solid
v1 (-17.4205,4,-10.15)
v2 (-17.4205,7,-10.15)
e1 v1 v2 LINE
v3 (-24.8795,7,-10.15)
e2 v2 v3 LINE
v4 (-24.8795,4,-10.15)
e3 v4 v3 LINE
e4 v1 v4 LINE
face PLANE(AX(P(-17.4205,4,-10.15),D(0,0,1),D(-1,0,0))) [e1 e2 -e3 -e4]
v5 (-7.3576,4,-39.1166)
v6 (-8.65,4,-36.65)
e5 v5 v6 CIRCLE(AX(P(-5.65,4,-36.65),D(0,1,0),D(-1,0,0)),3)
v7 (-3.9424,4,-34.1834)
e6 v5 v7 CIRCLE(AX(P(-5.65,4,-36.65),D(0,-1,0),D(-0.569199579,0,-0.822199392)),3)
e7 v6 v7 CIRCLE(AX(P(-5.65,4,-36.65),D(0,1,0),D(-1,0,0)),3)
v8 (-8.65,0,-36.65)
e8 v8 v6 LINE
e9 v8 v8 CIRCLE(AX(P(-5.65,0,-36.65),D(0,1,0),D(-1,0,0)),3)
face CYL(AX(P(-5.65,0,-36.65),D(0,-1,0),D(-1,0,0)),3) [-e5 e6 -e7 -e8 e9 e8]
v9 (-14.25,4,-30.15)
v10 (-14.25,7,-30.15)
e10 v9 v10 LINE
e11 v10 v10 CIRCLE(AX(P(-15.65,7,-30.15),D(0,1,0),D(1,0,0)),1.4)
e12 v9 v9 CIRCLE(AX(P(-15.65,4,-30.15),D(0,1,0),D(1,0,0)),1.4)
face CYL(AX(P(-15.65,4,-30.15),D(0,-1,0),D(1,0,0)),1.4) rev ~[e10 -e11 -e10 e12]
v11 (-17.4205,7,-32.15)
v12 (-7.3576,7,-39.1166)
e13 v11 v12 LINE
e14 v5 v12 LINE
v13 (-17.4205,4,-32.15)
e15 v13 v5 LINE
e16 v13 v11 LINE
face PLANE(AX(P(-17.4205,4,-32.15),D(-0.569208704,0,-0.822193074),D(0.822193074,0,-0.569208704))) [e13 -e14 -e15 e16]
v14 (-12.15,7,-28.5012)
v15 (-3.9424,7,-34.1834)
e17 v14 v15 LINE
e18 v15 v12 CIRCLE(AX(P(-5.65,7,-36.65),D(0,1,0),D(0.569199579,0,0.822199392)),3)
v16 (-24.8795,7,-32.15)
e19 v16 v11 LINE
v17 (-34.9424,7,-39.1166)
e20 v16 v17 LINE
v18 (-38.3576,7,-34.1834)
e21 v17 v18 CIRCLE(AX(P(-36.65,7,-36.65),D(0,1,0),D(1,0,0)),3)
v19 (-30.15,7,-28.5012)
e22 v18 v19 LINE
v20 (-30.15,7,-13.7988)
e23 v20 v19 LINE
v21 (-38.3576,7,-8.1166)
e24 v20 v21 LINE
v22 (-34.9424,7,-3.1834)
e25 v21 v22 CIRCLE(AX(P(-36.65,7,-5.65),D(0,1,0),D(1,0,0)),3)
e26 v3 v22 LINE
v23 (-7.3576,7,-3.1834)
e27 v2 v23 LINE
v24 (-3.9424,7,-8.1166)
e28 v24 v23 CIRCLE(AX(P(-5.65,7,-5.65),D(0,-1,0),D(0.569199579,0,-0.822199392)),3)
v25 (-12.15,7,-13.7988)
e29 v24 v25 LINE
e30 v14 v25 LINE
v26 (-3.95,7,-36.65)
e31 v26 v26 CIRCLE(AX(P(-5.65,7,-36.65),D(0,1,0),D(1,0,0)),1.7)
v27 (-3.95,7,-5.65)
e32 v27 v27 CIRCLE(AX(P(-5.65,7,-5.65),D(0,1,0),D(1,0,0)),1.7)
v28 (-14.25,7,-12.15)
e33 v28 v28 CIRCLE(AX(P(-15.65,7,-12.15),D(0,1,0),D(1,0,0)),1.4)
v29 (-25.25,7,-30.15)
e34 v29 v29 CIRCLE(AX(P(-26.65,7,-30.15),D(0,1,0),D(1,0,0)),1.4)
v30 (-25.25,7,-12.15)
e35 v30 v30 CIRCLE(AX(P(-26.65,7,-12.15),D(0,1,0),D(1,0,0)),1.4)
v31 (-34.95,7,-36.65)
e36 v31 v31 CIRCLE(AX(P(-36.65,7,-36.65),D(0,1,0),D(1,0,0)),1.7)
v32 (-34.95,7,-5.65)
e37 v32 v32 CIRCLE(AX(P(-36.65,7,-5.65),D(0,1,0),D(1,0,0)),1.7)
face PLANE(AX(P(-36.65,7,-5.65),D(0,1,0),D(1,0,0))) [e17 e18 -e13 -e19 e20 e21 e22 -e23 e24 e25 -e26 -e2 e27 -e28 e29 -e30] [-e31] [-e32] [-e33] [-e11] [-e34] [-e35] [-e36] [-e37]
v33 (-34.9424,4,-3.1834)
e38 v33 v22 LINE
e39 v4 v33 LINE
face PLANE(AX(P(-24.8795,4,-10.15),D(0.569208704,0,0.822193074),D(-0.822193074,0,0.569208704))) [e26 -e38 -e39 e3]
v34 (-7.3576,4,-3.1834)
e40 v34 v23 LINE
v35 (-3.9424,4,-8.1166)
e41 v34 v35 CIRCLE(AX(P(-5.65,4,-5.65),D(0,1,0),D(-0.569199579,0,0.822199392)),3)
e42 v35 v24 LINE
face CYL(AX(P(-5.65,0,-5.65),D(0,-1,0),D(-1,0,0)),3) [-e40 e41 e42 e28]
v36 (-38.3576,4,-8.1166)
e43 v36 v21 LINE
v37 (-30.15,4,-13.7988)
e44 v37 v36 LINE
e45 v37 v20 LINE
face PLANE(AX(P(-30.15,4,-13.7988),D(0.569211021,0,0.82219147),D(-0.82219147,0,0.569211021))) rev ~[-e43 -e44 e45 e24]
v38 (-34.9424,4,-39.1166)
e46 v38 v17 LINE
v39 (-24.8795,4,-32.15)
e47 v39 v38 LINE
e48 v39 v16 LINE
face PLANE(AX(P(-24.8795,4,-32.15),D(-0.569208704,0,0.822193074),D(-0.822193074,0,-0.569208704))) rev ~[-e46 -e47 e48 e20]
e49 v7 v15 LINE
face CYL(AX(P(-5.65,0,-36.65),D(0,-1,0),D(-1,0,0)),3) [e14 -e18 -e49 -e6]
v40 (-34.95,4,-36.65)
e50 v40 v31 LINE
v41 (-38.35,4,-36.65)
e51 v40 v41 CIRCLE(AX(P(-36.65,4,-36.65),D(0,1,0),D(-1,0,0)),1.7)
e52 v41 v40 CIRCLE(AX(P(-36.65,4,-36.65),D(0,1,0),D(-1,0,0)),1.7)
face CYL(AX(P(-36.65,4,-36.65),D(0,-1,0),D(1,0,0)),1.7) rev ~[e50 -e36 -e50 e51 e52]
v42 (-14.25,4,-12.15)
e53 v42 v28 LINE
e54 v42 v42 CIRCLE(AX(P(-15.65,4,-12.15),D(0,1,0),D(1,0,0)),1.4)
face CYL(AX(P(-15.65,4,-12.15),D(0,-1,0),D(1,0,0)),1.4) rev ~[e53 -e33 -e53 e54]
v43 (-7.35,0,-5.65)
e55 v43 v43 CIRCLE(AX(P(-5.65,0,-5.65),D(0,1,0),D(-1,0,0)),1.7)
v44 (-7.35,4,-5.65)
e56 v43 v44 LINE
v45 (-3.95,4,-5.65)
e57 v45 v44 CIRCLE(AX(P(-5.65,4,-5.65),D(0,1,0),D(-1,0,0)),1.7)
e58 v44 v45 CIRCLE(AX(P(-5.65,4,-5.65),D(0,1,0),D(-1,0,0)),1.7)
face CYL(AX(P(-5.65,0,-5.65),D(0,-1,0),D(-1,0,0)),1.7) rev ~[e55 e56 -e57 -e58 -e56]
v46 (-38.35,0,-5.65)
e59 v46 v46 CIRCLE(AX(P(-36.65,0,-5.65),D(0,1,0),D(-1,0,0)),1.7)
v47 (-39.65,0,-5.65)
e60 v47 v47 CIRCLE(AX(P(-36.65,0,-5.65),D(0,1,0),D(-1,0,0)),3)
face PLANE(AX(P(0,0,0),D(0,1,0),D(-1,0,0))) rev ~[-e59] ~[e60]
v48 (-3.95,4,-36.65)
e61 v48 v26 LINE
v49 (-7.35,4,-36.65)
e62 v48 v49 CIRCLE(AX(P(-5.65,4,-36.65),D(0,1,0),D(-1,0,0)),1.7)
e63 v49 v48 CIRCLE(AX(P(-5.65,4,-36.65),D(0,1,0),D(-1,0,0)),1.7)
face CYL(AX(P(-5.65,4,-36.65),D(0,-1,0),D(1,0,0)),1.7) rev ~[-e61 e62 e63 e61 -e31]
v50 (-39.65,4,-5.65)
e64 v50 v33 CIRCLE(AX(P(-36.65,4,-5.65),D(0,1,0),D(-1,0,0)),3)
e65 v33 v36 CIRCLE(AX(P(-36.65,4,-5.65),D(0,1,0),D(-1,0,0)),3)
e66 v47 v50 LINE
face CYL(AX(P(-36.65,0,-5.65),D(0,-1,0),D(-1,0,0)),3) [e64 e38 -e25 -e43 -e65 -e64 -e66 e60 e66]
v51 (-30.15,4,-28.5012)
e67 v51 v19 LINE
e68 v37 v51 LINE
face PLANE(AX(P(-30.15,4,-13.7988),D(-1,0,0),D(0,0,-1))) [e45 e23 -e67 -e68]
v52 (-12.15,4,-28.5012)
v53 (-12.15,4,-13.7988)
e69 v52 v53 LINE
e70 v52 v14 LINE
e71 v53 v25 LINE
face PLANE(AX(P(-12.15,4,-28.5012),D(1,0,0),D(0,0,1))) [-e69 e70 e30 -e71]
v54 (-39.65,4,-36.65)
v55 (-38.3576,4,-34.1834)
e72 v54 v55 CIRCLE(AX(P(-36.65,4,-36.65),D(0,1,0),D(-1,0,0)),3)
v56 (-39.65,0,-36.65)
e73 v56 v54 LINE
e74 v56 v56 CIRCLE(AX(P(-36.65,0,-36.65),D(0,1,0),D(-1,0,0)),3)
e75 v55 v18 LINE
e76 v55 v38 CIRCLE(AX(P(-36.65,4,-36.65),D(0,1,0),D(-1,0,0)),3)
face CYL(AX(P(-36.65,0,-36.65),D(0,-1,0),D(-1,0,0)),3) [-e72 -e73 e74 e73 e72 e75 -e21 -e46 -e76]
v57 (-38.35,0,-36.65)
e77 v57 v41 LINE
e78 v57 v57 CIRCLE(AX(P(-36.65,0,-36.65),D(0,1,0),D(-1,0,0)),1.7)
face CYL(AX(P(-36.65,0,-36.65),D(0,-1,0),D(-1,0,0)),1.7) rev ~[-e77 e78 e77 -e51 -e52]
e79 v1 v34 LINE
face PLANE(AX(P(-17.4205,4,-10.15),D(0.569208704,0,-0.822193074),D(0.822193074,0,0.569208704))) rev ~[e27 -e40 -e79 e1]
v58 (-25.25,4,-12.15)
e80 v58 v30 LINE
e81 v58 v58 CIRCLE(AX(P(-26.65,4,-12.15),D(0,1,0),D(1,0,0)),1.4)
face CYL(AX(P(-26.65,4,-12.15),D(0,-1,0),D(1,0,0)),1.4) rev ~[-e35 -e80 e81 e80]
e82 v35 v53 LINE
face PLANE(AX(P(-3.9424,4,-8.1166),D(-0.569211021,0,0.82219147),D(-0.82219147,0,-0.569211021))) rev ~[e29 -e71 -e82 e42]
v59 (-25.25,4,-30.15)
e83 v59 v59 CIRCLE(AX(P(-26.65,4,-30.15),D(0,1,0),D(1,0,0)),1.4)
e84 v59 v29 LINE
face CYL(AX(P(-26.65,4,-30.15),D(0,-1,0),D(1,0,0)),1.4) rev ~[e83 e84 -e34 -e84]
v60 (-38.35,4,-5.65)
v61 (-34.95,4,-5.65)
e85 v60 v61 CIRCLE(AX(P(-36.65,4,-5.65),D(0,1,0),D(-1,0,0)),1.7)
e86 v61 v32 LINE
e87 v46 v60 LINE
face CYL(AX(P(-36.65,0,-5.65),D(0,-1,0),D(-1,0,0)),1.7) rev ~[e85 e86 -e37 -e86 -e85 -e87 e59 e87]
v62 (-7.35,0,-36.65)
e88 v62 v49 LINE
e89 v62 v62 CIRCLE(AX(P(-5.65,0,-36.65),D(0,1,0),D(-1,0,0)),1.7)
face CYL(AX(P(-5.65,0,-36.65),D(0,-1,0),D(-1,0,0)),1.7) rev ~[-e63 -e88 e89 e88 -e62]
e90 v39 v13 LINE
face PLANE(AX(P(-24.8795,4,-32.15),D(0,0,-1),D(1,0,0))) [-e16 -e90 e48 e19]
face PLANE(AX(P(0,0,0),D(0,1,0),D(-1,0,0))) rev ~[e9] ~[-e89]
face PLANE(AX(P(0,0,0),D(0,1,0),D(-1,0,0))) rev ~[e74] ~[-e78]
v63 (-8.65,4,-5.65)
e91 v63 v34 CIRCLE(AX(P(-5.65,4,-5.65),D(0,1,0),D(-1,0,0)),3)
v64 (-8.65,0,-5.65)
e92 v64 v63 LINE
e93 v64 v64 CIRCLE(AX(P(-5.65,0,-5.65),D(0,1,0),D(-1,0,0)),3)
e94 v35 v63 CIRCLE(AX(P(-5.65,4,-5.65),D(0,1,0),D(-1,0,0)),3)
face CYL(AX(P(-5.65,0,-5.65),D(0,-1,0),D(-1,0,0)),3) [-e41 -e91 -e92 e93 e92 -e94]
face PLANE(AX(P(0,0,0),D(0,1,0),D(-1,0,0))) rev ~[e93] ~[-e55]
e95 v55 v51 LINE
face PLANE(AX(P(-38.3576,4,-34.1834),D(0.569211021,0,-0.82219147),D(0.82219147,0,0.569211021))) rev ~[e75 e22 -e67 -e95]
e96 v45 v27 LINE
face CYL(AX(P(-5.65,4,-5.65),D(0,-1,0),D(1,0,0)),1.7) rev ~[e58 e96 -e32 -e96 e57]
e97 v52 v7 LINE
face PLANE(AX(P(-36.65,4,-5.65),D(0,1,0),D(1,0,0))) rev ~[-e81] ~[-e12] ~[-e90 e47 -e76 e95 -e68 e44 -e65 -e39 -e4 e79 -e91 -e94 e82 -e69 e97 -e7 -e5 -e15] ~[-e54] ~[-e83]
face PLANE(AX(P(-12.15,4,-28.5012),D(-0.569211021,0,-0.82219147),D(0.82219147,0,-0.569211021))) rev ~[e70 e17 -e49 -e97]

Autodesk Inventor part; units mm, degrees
ref_plane "YZ Plane" through (0, 0, 0) normal (1, 0, 0) x (0, 1, 0)
ref_plane "XZ Plane" through (0, 0, 0) normal (0, 1, 0) x (-1, 0, 0)
ref_plane "XY Plane" through (0, 0, 0) normal (0, 0, 1) x (1, 0, 0)
sketch "Sketch1" plane through (0, 0, 0) normal (0, 1, 0) x (-1, 0, 0)
  line L0 (0, 0) -> (42.3, 0) construction
  line L1 (42.3, 0) -> (42.3, -42.3) construction
  line L2 (42.3, -42.3) -> (0, -42.3) construction
  line L3 (0, -42.3) -> (0, 0) construction
  circle A0 centre (36.65, -5.65) radius 1.7
  circle A1 centre (36.65, -36.65) radius 1.7
  circle A2 centre (5.65, -5.65) radius 1.7
  circle A3 centre (5.65, -36.65) radius 1.7
  line L4 (5.65, -5.65) -> (5.65, -36.65) construction
  line L5 (5.65, -36.65) -> (36.65, -36.65) construction
  line L6 (36.65, -36.65) -> (36.65, -5.65) construction
  line L7 (36.65, -5.65) -> (5.65, -5.65) construction
  circle A4 centre (36.65, -5.65) radius 3
  circle A5 centre (36.65, -36.65) radius 3
  circle A6 centre (5.65, -36.65) radius 3
  circle A7 centre (5.65, -5.65) radius 3
  dimension "d0" = 42.3
  dimension "d1" = 42.3
  dimension "d2" = 3.4
  dimension "d3" = 3.4
  dimension "d4" = 31
  dimension "d5" = 3.4
  dimension "d6" = 3.4
  dimension "d8" = 31
  dimension "d9" = 5.65
  dimension "d10" = 5.65
  dimension "d11" = 31
  dimension "d12" = 6
  dimension "d13" = 6
  dimension "d14" = 6
  dimension "d15" = 6
extrude "Extrusion1" add sketch "Sketch1" along normal blind 4
sketch "Sketch2" plane through (-36.65, 4, -5.65) normal (0, 1, 0) x (1, 0, 0)
  line L0 (-5.65, -5.65) -> (-5.65, 36.65) construction
  line L1 (36.65, -5.65) -> (-5.65, -5.65) construction
  line L2 (-5.65, 36.65) -> (36.65, 36.65) construction
  line L3 (36.65, 36.65) -> (36.65, -5.65) construction
  line L4 (-5.65, -5.65) -> (36.65, 36.65) construction
  line L5 (-5.65, 36.65) -> (36.65, -5.65) construction
  line L6 (24.5, 4.5) -> (6.5, 4.5)
  line L7 (6.5, 4.5) -> (6.5, 26.5)
  line L8 (6.5, 26.5) -> (24.5, 26.5)
  line L9 (24.5, 26.5) -> (24.5, 4.5)
  line L10 (24.5, 4.5) -> (6.5, 26.5) construction
  line L11 (6.5, 4.5) -> (24.5, 26.5) construction
  circle A0 centre (10, 6.5) radius 1.4
  circle A1 centre (10, 24.5) radius 1.4
  circle A2 centre (21, 24.5) radius 1.4
  circle A3 centre (21, 6.5) radius 1.4
  line L12 (10, 24.5) -> (21, 24.5) construction
  line L13 (21, 24.5) -> (21, 6.5) construction
  line L14 (21, 6.5) -> (10, 6.5) construction
  line L15 (10, 6.5) -> (10, 24.5) construction
  line L16 (21, 6.5) -> (21, 4.5) construction
  line L17 (21, 24.5) -> (21, 26.5) construction
  line L18 (10, 6.5) -> (6.5, 6.5) construction
  line L19 (21, 6.5) -> (24.5, 6.5) construction
  circle A4 centre (0, 0) radius 3 projected
  circle A5 centre (0, 31) radius 3 projected
  circle A6 centre (31, 31) radius 3 projected
  circle A7 centre (31, 0) radius 3 projected
  line L20 (11.7705, 4.5) -> (1.7076, -2.4666)
  circle A8 centre (0, 0) radius 3 construction
  line L21 (6.5, 8.1488) -> (-1.7076, 2.4666)
  circle A9 centre (0, 31) radius 3 projected
  line L22 (-1.7076, 28.5334) -> (6.5, 22.8512)
  line L23 (11.7705, 26.5) -> (1.7076, 33.4666)
  line L24 (6.5, 26.5) -> (0, 31) construction
  line L25 (6.5, 4.5) -> (0, 0) construction
  line L26 (24.5, 4.5) -> (31, 0) construction
  line L27 (19.2295, 4.5) -> (29.2924, -2.4666)
  circle A10 centre (31, 0) radius 3 projected
  line L28 (32.7076, 2.4666) -> (24.5, 8.1488)
  line L29 (24.5, 26.5) -> (31, 31) construction
  line L30 (19.2295, 26.5) -> (29.2924, 33.4666)
  line L31 (24.5, 22.8512) -> (32.7076, 28.5334)
  circle A11 centre (31, 31) radius 3 projected
  arc A12 (1.7076, 33.4666) -> (-1.7076, 28.5334) centre (0, 31) ccw
  arc A13 (32.7076, 28.5334) -> (29.2924, 33.4666) centre (31, 31) ccw
  arc A14 (29.2924, -2.4666) -> (32.7076, 2.4666) centre (31, 0) ccw
  arc A15 (-1.7076, 2.4666) -> (1.7076, -2.4666) centre (0, 0) ccw
  circle A16 centre (0, 0) radius 1.7 projected
  circle A17 centre (0, 31) radius 1.7 projected
  circle A18 centre (31, 31) radius 1.7 projected
  circle A19 centre (31, 0) radius 1.7 projected
  circle A20 centre (31, 0) radius 1.7
  circle A21 centre (31, 31) radius 1.7
  circle A22 centre (0, 0) radius 1.7
  circle A23 centre (0, 31) radius 1.7
  point P0 (15.5, 15.5)
  dimension "d18" = 18
  dimension "d19" = 22
  dimension "d20" = 2.8
  dimension "d21" = 2.8
  dimension "d22" = 2.8
  dimension "d23" = 2.8
  dimension "d24" = 11
  dimension "d25" = 18
extrude "Extrusion2" add sketch "Sketch2" along normal blind 3
properties part number "AdapterBoardNema17Mount"
